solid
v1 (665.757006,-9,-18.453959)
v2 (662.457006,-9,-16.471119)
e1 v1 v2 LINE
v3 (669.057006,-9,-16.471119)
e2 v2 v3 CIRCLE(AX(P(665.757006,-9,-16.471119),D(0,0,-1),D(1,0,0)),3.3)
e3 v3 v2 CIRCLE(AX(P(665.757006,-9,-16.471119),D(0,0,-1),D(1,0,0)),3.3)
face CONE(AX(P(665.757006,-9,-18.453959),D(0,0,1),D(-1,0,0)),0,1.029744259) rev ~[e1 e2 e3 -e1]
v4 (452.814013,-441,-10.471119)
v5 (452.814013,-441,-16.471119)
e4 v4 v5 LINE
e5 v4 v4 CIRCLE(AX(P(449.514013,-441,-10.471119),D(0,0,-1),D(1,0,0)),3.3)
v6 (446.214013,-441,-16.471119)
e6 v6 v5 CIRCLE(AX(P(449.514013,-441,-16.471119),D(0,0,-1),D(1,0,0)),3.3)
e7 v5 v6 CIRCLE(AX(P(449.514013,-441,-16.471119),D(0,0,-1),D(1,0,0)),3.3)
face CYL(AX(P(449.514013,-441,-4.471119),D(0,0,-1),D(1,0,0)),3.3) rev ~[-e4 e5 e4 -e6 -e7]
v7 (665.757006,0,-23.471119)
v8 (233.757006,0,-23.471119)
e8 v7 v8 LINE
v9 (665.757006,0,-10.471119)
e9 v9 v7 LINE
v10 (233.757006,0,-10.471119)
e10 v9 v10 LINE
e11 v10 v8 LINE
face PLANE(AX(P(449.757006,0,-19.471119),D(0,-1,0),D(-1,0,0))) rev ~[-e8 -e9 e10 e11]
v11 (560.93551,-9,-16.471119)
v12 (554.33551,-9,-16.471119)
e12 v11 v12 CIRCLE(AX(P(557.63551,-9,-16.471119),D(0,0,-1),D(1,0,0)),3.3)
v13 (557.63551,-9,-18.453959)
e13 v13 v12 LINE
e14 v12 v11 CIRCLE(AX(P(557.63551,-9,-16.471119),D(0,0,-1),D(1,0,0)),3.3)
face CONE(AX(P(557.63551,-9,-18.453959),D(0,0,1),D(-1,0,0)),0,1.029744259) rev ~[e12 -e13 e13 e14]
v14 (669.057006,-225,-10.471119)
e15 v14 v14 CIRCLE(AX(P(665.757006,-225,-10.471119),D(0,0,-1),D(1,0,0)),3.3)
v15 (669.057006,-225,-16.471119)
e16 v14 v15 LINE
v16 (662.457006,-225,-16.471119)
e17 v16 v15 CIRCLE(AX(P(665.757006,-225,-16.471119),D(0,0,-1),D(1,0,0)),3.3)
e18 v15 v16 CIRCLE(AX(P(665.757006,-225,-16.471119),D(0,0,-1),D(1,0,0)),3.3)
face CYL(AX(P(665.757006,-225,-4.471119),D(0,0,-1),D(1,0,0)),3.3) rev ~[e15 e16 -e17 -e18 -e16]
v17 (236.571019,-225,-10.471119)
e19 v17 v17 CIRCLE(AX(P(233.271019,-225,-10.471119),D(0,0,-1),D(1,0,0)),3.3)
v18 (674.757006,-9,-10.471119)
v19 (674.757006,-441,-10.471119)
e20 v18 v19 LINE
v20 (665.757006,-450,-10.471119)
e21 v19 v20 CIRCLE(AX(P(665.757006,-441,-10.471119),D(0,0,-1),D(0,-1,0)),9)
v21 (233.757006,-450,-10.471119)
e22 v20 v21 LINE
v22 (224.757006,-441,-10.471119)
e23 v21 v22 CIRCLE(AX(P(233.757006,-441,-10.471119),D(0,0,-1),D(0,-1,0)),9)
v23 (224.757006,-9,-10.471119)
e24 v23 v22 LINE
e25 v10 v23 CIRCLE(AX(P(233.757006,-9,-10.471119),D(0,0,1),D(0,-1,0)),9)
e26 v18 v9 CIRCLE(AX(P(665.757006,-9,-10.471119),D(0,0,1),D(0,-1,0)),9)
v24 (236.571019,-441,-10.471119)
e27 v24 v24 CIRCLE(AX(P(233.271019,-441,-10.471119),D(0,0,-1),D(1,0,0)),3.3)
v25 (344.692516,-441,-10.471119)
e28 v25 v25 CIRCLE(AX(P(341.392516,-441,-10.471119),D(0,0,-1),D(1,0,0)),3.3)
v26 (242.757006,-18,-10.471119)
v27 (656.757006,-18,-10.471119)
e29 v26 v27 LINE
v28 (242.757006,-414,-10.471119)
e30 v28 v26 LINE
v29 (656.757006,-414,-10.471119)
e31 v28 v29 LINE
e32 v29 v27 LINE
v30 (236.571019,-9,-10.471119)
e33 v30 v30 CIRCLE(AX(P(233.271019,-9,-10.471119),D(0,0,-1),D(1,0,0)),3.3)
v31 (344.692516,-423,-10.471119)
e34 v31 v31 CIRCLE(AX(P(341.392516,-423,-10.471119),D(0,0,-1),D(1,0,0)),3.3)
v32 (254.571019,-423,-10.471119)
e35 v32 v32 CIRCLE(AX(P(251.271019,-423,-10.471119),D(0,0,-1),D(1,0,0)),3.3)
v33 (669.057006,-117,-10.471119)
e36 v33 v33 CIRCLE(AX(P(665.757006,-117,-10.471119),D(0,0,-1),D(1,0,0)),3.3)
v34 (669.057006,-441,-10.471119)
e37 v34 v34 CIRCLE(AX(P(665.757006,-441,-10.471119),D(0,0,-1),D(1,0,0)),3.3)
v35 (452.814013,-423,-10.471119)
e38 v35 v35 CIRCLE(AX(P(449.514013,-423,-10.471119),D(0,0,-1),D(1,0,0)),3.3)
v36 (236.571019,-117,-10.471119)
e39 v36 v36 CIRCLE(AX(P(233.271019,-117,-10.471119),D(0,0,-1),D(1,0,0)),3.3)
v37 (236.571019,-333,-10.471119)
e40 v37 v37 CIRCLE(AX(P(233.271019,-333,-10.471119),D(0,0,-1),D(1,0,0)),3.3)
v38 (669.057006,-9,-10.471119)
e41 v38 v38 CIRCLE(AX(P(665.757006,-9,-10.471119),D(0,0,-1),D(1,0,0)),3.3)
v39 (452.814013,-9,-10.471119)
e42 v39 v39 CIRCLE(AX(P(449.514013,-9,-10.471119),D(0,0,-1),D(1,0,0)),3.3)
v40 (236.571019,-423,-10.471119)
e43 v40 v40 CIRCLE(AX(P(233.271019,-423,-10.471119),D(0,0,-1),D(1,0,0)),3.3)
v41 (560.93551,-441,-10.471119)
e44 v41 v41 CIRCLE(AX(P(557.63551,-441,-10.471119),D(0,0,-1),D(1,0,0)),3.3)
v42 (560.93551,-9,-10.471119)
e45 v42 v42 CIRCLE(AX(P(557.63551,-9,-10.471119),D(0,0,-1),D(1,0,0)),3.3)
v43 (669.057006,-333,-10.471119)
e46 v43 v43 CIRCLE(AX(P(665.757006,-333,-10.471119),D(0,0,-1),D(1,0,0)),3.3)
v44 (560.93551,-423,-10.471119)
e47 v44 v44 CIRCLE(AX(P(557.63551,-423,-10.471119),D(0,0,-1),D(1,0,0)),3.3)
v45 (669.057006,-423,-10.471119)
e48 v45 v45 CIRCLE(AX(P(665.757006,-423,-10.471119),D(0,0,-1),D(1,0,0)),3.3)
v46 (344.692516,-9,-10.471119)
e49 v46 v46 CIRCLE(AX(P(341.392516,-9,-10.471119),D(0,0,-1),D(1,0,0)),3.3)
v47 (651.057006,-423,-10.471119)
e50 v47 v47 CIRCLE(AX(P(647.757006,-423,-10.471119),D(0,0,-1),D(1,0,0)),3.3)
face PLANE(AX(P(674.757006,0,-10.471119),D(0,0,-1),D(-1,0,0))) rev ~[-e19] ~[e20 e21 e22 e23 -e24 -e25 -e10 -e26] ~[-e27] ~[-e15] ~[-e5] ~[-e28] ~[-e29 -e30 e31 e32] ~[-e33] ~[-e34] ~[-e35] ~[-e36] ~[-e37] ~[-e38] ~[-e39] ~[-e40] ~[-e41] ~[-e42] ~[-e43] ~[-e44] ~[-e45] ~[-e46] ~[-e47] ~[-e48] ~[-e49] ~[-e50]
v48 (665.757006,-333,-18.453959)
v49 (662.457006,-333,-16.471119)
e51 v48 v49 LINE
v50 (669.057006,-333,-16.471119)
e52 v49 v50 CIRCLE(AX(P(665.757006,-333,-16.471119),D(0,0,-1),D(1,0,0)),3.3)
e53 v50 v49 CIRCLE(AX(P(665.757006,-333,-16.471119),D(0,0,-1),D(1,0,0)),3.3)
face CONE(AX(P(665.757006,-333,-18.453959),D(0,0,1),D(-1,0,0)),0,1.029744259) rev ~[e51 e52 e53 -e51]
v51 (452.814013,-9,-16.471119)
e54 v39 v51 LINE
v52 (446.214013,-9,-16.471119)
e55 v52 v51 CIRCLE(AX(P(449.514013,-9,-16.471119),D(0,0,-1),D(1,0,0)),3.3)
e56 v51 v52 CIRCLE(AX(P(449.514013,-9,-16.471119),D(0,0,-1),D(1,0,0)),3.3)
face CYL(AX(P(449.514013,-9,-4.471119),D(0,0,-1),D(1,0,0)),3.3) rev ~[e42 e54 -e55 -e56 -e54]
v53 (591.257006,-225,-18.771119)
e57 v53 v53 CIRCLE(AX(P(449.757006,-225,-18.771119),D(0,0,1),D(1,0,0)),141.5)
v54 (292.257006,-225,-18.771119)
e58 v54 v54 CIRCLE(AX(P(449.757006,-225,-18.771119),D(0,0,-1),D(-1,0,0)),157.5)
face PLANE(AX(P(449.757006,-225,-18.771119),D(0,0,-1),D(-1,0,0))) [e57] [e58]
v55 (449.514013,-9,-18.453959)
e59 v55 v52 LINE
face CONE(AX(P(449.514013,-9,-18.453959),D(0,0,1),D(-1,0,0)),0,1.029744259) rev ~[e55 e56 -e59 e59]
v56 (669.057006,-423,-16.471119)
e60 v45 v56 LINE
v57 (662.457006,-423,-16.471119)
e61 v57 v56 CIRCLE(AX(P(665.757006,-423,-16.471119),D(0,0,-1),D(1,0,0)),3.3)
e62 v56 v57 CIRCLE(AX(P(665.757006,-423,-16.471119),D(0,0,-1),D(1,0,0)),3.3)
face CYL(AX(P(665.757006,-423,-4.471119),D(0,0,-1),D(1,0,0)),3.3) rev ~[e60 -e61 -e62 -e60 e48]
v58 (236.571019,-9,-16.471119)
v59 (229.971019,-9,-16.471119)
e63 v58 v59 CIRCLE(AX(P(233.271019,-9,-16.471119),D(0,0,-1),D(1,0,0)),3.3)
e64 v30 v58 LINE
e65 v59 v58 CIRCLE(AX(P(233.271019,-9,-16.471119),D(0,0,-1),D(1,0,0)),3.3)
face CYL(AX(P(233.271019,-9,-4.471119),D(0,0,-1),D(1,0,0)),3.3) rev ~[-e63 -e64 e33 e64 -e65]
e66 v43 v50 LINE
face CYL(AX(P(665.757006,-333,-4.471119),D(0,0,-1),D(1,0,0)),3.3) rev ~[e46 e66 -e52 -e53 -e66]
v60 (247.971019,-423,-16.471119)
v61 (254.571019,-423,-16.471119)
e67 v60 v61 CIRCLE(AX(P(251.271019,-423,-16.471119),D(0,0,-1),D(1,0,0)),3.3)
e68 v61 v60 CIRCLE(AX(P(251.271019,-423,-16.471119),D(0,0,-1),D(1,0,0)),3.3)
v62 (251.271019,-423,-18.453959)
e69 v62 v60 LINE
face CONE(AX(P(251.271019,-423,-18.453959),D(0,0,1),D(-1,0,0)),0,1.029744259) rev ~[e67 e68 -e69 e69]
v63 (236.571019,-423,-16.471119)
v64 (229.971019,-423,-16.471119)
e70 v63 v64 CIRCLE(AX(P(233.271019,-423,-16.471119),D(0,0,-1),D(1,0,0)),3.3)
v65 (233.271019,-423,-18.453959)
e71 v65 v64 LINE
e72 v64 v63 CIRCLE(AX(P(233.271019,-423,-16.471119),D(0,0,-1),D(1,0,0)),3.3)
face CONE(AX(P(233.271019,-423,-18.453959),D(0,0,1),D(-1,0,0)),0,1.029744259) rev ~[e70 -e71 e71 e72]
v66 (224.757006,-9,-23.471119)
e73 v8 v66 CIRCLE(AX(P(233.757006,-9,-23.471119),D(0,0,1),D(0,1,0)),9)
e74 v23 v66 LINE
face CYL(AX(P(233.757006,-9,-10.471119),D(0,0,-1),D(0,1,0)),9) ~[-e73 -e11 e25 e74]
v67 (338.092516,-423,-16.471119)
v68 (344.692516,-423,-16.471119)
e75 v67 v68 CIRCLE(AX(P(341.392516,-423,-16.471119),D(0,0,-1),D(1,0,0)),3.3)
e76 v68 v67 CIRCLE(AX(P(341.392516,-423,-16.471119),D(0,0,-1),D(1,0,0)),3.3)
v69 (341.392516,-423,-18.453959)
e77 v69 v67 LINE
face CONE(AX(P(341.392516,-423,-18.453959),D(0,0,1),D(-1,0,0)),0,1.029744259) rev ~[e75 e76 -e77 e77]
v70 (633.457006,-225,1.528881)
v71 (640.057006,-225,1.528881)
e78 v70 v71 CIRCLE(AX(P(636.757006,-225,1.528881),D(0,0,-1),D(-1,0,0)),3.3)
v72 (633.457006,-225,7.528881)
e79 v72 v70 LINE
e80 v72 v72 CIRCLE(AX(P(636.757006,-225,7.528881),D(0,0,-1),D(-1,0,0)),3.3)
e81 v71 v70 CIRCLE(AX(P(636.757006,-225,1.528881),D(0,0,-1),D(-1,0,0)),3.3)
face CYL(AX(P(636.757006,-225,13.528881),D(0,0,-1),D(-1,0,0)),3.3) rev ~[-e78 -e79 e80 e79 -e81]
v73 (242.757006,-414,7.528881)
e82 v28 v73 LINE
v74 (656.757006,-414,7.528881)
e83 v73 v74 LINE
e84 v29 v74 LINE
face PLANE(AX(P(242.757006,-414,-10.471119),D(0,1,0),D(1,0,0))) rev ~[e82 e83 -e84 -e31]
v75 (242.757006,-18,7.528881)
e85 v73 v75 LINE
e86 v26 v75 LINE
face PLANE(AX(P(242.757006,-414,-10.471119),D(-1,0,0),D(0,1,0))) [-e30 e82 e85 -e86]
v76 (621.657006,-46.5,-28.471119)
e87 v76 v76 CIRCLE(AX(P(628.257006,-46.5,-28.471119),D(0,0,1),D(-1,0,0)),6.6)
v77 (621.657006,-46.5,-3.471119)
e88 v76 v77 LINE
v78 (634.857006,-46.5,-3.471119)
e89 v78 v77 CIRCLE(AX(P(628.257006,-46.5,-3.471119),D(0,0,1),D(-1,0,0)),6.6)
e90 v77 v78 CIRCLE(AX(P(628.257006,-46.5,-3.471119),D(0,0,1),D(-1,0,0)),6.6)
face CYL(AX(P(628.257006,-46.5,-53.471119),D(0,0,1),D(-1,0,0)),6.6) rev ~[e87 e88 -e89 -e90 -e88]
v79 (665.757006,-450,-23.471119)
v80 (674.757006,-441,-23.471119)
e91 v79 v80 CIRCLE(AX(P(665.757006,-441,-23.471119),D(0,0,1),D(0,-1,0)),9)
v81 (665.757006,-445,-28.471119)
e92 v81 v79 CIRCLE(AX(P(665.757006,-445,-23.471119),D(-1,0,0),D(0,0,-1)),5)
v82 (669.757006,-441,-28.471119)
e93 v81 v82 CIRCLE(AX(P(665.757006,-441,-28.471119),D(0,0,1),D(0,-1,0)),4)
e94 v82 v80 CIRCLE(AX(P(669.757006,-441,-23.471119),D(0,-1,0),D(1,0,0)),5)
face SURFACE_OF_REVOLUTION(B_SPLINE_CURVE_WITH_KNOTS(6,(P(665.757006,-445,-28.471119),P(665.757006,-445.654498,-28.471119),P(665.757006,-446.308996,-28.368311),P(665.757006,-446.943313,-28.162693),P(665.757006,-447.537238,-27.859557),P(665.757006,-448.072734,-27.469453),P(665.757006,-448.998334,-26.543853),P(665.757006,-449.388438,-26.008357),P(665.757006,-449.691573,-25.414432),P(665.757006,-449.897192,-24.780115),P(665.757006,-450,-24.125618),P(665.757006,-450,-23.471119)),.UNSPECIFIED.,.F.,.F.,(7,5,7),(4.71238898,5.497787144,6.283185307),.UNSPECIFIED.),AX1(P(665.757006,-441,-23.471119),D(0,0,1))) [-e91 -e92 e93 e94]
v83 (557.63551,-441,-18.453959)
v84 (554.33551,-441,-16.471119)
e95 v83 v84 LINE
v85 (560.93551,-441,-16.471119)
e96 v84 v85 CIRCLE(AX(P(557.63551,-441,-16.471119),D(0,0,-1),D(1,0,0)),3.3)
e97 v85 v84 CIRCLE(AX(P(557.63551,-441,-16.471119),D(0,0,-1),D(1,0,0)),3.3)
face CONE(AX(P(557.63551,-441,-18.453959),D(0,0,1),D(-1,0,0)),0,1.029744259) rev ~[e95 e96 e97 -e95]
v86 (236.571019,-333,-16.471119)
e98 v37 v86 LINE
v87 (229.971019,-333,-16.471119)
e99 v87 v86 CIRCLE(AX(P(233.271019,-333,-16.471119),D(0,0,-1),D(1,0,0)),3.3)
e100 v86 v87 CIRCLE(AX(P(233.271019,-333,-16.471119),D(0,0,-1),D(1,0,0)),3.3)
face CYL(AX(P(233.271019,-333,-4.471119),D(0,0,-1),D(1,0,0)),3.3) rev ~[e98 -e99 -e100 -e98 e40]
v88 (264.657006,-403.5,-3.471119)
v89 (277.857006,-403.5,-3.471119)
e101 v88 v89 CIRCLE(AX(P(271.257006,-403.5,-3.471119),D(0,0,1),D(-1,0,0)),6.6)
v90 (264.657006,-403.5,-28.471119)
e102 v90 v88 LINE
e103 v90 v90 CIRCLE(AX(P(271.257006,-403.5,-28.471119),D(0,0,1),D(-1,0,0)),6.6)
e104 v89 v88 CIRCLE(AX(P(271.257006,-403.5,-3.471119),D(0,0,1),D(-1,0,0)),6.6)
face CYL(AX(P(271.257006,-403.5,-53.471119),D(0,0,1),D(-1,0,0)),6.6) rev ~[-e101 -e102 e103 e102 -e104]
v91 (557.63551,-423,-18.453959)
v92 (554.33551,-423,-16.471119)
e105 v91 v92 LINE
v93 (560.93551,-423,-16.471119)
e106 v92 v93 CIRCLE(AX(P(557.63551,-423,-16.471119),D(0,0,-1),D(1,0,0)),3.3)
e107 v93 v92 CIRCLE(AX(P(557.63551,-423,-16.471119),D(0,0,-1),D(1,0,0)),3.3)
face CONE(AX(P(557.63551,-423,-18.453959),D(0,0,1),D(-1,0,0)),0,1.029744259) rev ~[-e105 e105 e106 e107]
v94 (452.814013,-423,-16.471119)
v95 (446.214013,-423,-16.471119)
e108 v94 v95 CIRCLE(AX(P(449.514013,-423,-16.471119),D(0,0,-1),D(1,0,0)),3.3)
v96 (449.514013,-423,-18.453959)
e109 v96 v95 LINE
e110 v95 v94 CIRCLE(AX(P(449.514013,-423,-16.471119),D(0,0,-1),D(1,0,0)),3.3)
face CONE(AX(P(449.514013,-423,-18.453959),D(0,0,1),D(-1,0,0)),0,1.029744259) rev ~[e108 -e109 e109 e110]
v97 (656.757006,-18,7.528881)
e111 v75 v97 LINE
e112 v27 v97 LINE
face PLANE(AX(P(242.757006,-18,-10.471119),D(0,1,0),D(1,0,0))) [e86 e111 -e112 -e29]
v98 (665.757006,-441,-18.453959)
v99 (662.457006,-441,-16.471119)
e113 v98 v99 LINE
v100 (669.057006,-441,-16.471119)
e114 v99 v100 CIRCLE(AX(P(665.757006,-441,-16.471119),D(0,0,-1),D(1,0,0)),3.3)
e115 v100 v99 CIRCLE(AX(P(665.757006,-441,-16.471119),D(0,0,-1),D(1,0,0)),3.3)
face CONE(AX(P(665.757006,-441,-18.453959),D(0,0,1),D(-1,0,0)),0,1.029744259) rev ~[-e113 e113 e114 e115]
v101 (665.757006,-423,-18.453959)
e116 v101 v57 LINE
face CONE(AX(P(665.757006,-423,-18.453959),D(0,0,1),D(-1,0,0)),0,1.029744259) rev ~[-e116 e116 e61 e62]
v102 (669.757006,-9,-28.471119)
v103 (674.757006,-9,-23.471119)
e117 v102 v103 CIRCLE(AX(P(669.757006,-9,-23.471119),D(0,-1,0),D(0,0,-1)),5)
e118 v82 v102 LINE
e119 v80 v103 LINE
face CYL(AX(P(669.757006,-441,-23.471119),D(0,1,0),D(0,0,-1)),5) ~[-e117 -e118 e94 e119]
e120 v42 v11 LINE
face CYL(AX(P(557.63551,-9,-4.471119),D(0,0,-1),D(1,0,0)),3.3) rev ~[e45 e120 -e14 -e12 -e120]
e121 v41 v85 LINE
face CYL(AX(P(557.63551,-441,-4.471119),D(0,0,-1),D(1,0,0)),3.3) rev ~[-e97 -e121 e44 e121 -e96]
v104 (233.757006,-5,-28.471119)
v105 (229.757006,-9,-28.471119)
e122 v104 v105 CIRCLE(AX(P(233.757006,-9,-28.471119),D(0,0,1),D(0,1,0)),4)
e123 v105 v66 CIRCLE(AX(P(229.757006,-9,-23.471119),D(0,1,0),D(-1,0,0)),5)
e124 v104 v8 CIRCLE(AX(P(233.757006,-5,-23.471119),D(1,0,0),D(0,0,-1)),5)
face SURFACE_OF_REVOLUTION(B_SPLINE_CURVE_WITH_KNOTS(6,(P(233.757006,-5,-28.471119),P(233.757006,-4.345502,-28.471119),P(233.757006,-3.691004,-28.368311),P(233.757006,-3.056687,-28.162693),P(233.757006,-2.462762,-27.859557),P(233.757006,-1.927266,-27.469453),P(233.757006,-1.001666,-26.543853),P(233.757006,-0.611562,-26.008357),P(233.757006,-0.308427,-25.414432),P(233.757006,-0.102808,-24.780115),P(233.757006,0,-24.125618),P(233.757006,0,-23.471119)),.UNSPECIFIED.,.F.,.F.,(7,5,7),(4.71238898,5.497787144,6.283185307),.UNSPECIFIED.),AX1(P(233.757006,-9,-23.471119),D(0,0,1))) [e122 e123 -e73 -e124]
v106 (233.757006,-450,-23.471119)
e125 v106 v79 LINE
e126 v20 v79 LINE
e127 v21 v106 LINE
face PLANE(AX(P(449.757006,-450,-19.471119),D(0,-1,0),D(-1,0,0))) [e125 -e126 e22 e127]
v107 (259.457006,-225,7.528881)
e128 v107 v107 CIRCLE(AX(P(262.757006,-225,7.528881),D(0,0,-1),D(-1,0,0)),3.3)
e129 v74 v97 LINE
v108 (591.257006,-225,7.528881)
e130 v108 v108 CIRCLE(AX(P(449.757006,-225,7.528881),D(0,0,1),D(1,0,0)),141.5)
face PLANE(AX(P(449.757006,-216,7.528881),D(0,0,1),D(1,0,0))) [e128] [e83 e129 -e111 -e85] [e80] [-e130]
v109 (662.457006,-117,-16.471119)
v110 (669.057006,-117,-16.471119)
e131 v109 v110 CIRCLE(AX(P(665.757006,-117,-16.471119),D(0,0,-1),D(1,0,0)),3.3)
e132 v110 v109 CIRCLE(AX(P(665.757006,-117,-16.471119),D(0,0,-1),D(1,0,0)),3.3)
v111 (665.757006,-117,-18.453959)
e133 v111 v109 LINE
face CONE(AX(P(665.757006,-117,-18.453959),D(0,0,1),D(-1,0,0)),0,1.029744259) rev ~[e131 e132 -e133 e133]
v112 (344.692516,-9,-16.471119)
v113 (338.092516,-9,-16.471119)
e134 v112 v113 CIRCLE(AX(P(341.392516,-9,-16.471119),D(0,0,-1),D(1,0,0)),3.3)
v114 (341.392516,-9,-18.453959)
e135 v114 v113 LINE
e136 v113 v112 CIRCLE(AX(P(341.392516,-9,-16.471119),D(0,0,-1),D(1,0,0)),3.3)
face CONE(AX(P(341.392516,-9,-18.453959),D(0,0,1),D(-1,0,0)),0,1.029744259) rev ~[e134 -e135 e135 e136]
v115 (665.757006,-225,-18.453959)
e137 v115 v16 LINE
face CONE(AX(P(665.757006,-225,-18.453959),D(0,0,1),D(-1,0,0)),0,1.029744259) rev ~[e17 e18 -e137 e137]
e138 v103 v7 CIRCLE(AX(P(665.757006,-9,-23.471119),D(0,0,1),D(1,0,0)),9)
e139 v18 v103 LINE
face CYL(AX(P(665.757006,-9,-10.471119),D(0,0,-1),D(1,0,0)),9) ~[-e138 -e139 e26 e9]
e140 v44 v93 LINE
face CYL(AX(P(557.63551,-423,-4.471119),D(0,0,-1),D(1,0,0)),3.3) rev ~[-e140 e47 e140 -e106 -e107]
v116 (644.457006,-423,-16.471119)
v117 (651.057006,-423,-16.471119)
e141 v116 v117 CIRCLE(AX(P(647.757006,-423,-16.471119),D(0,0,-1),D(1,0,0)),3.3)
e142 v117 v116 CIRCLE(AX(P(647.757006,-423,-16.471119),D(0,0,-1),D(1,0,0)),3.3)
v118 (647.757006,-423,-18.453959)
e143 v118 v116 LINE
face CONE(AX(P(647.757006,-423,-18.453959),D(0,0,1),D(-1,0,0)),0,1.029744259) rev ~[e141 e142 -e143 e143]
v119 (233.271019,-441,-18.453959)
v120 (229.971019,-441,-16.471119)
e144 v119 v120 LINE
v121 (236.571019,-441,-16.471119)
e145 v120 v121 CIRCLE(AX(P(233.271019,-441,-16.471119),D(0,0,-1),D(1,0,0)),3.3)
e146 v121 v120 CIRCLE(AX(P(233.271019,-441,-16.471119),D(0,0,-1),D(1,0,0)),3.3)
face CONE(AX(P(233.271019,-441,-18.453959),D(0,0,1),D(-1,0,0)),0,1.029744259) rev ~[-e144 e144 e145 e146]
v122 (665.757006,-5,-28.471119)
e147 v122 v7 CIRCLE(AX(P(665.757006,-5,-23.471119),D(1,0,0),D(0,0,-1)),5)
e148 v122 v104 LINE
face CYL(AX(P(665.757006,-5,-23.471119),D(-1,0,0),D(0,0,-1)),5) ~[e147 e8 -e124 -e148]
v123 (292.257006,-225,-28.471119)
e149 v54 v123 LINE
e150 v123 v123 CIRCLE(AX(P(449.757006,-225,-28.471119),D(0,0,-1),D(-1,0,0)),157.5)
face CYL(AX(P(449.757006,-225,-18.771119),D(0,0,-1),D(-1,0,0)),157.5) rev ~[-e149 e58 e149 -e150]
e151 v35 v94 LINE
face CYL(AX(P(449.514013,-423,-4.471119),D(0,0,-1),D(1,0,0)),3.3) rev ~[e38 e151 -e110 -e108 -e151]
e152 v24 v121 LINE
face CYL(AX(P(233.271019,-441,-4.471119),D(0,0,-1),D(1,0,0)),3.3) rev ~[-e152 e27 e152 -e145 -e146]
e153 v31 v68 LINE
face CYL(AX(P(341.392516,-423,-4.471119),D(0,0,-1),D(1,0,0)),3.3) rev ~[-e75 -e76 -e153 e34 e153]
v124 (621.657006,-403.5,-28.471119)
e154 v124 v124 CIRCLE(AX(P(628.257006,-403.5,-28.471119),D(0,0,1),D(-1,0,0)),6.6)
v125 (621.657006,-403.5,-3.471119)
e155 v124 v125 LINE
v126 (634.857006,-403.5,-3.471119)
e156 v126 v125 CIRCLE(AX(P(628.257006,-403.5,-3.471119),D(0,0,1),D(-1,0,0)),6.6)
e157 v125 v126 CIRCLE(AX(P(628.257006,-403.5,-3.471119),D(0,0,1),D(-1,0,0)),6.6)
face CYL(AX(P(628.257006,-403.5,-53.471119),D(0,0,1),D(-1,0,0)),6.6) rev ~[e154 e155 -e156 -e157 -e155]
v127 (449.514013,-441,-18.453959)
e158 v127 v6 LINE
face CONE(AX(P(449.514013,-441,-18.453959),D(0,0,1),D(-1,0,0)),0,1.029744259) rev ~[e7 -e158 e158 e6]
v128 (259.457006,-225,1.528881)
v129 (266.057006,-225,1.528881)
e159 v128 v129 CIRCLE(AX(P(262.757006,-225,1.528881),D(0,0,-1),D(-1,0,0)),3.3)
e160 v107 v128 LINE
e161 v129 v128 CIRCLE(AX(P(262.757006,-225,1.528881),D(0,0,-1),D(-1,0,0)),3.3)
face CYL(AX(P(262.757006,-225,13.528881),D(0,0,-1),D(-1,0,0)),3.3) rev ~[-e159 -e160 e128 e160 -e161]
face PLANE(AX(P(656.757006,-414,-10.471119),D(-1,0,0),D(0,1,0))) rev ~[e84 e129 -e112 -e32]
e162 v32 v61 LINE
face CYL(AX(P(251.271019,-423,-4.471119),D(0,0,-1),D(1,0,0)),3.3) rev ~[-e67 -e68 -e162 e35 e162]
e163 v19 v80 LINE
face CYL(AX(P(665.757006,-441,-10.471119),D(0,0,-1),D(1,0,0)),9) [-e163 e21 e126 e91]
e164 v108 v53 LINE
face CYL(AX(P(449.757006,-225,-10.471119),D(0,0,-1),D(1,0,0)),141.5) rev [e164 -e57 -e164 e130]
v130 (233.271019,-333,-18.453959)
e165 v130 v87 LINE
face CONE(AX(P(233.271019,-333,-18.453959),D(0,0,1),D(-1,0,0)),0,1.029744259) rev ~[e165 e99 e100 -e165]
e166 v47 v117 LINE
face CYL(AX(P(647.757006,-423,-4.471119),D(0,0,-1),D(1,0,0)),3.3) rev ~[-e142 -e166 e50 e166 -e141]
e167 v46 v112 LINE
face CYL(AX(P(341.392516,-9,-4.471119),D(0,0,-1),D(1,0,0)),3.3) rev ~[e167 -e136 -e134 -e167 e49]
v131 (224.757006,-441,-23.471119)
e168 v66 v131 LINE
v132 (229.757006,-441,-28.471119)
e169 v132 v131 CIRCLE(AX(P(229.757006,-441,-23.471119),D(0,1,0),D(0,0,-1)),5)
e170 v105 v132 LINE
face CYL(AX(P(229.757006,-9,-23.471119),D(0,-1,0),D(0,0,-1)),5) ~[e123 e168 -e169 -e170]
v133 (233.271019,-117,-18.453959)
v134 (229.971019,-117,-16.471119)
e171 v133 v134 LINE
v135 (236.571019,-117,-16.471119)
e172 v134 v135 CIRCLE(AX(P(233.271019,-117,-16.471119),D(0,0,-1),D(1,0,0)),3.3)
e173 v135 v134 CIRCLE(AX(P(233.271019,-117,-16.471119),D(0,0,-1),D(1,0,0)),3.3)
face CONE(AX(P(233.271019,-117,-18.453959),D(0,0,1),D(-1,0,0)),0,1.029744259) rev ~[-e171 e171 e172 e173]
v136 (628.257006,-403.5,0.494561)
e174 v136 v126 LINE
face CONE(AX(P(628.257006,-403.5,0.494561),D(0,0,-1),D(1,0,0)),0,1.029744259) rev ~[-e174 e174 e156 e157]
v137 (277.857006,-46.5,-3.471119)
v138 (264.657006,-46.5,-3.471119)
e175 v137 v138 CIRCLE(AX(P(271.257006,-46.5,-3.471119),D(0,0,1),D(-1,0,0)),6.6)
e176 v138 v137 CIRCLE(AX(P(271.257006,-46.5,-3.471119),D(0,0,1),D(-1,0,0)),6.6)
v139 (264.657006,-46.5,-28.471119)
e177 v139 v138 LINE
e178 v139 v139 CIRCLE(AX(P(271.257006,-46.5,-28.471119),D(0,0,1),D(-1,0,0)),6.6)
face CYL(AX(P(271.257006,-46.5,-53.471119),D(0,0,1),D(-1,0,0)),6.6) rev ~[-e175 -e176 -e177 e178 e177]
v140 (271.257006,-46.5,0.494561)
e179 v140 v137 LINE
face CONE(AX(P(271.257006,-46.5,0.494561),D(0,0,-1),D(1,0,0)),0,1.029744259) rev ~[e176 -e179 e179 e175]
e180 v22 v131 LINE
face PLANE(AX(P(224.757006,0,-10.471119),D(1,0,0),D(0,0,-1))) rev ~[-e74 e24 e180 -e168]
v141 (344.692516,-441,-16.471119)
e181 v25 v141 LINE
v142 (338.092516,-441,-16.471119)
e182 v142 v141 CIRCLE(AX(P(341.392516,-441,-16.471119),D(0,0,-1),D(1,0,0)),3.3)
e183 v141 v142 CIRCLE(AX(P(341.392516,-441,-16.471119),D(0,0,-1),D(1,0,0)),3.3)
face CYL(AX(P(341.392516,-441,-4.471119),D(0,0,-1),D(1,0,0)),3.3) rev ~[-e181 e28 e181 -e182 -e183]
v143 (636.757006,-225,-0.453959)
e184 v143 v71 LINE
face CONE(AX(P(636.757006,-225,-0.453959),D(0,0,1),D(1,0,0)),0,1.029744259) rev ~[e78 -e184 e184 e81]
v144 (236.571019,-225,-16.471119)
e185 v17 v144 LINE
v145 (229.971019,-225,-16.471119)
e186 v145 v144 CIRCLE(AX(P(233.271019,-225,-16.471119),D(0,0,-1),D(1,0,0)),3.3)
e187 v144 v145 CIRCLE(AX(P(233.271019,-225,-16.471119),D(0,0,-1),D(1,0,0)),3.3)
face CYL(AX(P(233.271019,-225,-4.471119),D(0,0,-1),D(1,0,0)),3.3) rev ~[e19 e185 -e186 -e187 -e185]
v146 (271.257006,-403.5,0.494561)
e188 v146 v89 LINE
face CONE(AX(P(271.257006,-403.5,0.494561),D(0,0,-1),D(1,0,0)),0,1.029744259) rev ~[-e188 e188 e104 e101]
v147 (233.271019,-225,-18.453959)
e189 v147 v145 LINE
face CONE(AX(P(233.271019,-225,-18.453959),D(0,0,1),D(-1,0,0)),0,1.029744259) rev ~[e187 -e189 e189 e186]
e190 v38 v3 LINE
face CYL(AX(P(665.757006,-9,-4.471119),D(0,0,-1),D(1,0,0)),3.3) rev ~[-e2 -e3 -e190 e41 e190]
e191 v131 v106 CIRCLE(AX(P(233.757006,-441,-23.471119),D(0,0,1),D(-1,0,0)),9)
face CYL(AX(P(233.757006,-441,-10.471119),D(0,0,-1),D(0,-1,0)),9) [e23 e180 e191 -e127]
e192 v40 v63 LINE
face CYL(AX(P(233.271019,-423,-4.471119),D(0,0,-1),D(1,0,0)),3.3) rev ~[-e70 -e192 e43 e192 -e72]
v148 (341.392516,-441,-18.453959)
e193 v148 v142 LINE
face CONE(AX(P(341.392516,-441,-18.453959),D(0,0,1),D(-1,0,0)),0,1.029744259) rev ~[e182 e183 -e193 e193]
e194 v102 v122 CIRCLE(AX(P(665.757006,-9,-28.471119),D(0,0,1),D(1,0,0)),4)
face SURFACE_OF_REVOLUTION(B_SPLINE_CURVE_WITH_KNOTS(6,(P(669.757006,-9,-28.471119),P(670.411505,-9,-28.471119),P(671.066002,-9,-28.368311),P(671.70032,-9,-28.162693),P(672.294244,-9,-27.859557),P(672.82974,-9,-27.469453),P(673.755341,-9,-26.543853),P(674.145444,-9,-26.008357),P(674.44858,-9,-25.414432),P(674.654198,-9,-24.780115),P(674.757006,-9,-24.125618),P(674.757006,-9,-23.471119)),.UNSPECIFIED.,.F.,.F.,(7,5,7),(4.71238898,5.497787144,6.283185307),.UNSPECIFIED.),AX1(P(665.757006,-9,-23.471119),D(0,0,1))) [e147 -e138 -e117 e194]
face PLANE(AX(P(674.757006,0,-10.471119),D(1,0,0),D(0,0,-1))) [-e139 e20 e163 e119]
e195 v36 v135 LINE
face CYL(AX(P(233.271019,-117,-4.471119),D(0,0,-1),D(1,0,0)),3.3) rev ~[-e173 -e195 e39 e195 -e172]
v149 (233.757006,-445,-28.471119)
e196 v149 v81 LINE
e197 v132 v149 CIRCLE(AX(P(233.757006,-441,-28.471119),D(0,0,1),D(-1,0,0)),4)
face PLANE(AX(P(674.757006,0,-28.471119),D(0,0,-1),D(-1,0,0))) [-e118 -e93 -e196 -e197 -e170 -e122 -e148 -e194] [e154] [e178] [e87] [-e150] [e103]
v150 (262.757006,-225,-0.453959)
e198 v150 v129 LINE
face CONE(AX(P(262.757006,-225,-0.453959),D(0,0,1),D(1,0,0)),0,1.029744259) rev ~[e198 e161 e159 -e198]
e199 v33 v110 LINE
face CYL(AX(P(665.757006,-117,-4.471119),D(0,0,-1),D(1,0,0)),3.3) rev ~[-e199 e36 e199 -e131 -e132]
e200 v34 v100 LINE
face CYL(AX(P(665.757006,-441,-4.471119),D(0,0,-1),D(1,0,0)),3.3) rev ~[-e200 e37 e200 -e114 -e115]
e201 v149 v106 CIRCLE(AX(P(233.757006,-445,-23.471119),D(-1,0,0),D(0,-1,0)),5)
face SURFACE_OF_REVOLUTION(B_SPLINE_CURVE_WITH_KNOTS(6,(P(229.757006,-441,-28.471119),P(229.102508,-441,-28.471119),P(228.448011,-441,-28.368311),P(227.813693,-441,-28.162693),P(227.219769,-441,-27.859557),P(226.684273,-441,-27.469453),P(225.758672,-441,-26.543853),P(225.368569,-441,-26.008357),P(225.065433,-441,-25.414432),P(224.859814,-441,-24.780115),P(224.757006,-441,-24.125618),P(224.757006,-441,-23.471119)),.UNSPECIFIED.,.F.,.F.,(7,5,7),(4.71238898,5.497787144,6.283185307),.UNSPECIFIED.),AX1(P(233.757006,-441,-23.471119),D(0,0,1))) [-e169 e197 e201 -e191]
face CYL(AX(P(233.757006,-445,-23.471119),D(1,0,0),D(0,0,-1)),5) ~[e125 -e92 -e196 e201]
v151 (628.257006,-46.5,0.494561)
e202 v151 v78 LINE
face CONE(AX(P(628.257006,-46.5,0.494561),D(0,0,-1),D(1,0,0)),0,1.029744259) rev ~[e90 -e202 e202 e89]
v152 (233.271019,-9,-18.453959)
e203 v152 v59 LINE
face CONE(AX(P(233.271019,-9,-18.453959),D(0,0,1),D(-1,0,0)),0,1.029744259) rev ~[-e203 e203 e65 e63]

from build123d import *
from build123d import SkipClean  # not in build123d's __all__

# Parameters (mm, degrees)
F0_W           = 450
F0_H           = 18
F1_DEPTH       = 450
F3_D           = 283
F3_DEPTH       = 36
F3_CBORE_D     = 315
F3_CBORE_DEPTH = 9.7
F3_TIP         = 85.0217775924
F4_R           = 9
F5_R           = 5
F7_D           = 6.6
F7_DEPTH       = 6
F7_TIP         = 1.9828400428
F8_ANGLE       = 180
F9_W           = 414
F9_H           = 396
F9_R           = 141.5
F10_DEPTH      = 18
F13_D          = 13.2
F13_DEPTH      = 25
F13_TIP        = 3.9656800856
F14_D          = 6.6
F14_DEPTH      = 6
F14_TIP        = 1.9828400428


# Not quite as in the source:
# - after a boolean that leaves OpenCascade's solid faulty, fix() repairs it


with BuildPart() as f1:
    # F0 (on Front) → F1 (new body)
    with BuildSketch(Plane.XZ):
        with Locations((-0.2429935762, -1.4711191316)):
            Rectangle(F0_W, F0_H)
    extrude(amount=F1_DEPTH)

    # F3
    with Locations(Plane.XY.offset(7.5288808684)):
        with Locations((-0.2429935762, -225)):
            CounterBoreHole(F3_D / 2, F3_CBORE_D / 2, F3_CBORE_DEPTH, depth=F3_DEPTH)
            with Locations((0, 0, -(F3_DEPTH + F3_TIP / 2))):  # 118° drill point
                Cone(0, F3_D / 2, F3_TIP, mode=Mode.SUBTRACT)

    # F4
    f4_edges = [f1.edges().sort_by_distance(p)[0] for p in [
        (-225.242994, -450, -1.471119),
        (-225.242994, 0, -1.471119),
        (224.757006, 0, -1.471119),
        (224.757006, -450, -1.471119),
    ]]
    fillet(f4_edges, radius=F4_R)

    # F5
    f5_edges = [f1.edges().sort_by_distance(p)[0] for p in [
        (-0.242994, 0, 7.528881),
        (224.757006, -225, 7.528881),
        (-0.242994, -450, 7.528881),
        (-225.242994, -225, 7.528881),
    ]]
    fillet(f5_edges, radius=F5_R)

    # F7
    with Locations(Plane(origin=(0, 0, -10.4711191316), x_dir=(1, 0, 0), z_dir=(0, 0, -1))):
        with Locations((-216.2429935762, 441), (-108.1214967881, 441), (0, 441), (108.1214967881, 441), (216.2429935762, 441), (108.1214967881, 423), (0, 423), (-108.1214967881, 423), (-198.2429935762, 423), (198.2429935762, 423), (216.2429935762, 333), (216.2429935762, 225), (216.2429935762, 117), (216.2429935762, 9), (108.1214967881, 9), (0, 9), (-108.1214967881, 9), (-216.2429935762, 9), (-216.2429935762, 117), (-216.2429935762, 225), (-216.2429935762, 333), (-216.2429935762, 423), (216.2429935762, 423)):
            Hole(F7_D / 2, depth=F7_DEPTH)
            with Locations((0, 0, -(F7_DEPTH + F7_TIP / 2))):  # 118° drill point
                Cone(0, F7_D / 2, F7_TIP, mode=Mode.SUBTRACT)


with BuildPart() as f1_1:
    # F8: moved
    add(f1.part.rotate(Axis((224.7570064238, -225, -10.4711191316), (0, 1, 0)), F8_ANGLE), clean=False)

    # F9 (on face) → F10 (join)
    with BuildSketch(Plane.XY.offset(-10.4711191316)):
        with Locations((449.7570064238, -216)):
            Rectangle(F9_W, F9_H)
        with Locations((449.7570064238, -225)):
            Circle(F9_R, mode=Mode.SUBTRACT)
    with SkipClean():  # cleaning this boolean's faces spoils the solid; the shape is the same uncleaned
        extrude(amount=F10_DEPTH)

    # F13
    with Locations(Plane(origin=(0, 0, -28.4711191316), x_dir=(1, 0, 0), z_dir=(0, 0, -1))):
        with Locations((628.2570064238, 46.5), (271.2570064238, 46.5), (271.2570064238, 403.5), (628.2570064238, 403.5)):
            Hole(F13_D / 2, depth=F13_DEPTH)
            with Locations((0, 0, -(F13_DEPTH + F13_TIP / 2))):  # 118° drill point
                Cone(0, F13_D / 2, F13_TIP, mode=Mode.SUBTRACT)

    add(f1_1.part.fix(), mode=Mode.REPLACE)

    # F14
    with Locations(Plane.XY.offset(7.5288808684)):
        with Locations((262.7570064238, -225), (636.7570064238, -225)):
            Hole(F14_D / 2, depth=F14_DEPTH)
            with Locations((0, 0, -(F14_DEPTH + F14_TIP / 2))):  # 118° drill point
                Cone(0, F14_D / 2, F14_TIP, mode=Mode.SUBTRACT)


solid = f1_1.part
